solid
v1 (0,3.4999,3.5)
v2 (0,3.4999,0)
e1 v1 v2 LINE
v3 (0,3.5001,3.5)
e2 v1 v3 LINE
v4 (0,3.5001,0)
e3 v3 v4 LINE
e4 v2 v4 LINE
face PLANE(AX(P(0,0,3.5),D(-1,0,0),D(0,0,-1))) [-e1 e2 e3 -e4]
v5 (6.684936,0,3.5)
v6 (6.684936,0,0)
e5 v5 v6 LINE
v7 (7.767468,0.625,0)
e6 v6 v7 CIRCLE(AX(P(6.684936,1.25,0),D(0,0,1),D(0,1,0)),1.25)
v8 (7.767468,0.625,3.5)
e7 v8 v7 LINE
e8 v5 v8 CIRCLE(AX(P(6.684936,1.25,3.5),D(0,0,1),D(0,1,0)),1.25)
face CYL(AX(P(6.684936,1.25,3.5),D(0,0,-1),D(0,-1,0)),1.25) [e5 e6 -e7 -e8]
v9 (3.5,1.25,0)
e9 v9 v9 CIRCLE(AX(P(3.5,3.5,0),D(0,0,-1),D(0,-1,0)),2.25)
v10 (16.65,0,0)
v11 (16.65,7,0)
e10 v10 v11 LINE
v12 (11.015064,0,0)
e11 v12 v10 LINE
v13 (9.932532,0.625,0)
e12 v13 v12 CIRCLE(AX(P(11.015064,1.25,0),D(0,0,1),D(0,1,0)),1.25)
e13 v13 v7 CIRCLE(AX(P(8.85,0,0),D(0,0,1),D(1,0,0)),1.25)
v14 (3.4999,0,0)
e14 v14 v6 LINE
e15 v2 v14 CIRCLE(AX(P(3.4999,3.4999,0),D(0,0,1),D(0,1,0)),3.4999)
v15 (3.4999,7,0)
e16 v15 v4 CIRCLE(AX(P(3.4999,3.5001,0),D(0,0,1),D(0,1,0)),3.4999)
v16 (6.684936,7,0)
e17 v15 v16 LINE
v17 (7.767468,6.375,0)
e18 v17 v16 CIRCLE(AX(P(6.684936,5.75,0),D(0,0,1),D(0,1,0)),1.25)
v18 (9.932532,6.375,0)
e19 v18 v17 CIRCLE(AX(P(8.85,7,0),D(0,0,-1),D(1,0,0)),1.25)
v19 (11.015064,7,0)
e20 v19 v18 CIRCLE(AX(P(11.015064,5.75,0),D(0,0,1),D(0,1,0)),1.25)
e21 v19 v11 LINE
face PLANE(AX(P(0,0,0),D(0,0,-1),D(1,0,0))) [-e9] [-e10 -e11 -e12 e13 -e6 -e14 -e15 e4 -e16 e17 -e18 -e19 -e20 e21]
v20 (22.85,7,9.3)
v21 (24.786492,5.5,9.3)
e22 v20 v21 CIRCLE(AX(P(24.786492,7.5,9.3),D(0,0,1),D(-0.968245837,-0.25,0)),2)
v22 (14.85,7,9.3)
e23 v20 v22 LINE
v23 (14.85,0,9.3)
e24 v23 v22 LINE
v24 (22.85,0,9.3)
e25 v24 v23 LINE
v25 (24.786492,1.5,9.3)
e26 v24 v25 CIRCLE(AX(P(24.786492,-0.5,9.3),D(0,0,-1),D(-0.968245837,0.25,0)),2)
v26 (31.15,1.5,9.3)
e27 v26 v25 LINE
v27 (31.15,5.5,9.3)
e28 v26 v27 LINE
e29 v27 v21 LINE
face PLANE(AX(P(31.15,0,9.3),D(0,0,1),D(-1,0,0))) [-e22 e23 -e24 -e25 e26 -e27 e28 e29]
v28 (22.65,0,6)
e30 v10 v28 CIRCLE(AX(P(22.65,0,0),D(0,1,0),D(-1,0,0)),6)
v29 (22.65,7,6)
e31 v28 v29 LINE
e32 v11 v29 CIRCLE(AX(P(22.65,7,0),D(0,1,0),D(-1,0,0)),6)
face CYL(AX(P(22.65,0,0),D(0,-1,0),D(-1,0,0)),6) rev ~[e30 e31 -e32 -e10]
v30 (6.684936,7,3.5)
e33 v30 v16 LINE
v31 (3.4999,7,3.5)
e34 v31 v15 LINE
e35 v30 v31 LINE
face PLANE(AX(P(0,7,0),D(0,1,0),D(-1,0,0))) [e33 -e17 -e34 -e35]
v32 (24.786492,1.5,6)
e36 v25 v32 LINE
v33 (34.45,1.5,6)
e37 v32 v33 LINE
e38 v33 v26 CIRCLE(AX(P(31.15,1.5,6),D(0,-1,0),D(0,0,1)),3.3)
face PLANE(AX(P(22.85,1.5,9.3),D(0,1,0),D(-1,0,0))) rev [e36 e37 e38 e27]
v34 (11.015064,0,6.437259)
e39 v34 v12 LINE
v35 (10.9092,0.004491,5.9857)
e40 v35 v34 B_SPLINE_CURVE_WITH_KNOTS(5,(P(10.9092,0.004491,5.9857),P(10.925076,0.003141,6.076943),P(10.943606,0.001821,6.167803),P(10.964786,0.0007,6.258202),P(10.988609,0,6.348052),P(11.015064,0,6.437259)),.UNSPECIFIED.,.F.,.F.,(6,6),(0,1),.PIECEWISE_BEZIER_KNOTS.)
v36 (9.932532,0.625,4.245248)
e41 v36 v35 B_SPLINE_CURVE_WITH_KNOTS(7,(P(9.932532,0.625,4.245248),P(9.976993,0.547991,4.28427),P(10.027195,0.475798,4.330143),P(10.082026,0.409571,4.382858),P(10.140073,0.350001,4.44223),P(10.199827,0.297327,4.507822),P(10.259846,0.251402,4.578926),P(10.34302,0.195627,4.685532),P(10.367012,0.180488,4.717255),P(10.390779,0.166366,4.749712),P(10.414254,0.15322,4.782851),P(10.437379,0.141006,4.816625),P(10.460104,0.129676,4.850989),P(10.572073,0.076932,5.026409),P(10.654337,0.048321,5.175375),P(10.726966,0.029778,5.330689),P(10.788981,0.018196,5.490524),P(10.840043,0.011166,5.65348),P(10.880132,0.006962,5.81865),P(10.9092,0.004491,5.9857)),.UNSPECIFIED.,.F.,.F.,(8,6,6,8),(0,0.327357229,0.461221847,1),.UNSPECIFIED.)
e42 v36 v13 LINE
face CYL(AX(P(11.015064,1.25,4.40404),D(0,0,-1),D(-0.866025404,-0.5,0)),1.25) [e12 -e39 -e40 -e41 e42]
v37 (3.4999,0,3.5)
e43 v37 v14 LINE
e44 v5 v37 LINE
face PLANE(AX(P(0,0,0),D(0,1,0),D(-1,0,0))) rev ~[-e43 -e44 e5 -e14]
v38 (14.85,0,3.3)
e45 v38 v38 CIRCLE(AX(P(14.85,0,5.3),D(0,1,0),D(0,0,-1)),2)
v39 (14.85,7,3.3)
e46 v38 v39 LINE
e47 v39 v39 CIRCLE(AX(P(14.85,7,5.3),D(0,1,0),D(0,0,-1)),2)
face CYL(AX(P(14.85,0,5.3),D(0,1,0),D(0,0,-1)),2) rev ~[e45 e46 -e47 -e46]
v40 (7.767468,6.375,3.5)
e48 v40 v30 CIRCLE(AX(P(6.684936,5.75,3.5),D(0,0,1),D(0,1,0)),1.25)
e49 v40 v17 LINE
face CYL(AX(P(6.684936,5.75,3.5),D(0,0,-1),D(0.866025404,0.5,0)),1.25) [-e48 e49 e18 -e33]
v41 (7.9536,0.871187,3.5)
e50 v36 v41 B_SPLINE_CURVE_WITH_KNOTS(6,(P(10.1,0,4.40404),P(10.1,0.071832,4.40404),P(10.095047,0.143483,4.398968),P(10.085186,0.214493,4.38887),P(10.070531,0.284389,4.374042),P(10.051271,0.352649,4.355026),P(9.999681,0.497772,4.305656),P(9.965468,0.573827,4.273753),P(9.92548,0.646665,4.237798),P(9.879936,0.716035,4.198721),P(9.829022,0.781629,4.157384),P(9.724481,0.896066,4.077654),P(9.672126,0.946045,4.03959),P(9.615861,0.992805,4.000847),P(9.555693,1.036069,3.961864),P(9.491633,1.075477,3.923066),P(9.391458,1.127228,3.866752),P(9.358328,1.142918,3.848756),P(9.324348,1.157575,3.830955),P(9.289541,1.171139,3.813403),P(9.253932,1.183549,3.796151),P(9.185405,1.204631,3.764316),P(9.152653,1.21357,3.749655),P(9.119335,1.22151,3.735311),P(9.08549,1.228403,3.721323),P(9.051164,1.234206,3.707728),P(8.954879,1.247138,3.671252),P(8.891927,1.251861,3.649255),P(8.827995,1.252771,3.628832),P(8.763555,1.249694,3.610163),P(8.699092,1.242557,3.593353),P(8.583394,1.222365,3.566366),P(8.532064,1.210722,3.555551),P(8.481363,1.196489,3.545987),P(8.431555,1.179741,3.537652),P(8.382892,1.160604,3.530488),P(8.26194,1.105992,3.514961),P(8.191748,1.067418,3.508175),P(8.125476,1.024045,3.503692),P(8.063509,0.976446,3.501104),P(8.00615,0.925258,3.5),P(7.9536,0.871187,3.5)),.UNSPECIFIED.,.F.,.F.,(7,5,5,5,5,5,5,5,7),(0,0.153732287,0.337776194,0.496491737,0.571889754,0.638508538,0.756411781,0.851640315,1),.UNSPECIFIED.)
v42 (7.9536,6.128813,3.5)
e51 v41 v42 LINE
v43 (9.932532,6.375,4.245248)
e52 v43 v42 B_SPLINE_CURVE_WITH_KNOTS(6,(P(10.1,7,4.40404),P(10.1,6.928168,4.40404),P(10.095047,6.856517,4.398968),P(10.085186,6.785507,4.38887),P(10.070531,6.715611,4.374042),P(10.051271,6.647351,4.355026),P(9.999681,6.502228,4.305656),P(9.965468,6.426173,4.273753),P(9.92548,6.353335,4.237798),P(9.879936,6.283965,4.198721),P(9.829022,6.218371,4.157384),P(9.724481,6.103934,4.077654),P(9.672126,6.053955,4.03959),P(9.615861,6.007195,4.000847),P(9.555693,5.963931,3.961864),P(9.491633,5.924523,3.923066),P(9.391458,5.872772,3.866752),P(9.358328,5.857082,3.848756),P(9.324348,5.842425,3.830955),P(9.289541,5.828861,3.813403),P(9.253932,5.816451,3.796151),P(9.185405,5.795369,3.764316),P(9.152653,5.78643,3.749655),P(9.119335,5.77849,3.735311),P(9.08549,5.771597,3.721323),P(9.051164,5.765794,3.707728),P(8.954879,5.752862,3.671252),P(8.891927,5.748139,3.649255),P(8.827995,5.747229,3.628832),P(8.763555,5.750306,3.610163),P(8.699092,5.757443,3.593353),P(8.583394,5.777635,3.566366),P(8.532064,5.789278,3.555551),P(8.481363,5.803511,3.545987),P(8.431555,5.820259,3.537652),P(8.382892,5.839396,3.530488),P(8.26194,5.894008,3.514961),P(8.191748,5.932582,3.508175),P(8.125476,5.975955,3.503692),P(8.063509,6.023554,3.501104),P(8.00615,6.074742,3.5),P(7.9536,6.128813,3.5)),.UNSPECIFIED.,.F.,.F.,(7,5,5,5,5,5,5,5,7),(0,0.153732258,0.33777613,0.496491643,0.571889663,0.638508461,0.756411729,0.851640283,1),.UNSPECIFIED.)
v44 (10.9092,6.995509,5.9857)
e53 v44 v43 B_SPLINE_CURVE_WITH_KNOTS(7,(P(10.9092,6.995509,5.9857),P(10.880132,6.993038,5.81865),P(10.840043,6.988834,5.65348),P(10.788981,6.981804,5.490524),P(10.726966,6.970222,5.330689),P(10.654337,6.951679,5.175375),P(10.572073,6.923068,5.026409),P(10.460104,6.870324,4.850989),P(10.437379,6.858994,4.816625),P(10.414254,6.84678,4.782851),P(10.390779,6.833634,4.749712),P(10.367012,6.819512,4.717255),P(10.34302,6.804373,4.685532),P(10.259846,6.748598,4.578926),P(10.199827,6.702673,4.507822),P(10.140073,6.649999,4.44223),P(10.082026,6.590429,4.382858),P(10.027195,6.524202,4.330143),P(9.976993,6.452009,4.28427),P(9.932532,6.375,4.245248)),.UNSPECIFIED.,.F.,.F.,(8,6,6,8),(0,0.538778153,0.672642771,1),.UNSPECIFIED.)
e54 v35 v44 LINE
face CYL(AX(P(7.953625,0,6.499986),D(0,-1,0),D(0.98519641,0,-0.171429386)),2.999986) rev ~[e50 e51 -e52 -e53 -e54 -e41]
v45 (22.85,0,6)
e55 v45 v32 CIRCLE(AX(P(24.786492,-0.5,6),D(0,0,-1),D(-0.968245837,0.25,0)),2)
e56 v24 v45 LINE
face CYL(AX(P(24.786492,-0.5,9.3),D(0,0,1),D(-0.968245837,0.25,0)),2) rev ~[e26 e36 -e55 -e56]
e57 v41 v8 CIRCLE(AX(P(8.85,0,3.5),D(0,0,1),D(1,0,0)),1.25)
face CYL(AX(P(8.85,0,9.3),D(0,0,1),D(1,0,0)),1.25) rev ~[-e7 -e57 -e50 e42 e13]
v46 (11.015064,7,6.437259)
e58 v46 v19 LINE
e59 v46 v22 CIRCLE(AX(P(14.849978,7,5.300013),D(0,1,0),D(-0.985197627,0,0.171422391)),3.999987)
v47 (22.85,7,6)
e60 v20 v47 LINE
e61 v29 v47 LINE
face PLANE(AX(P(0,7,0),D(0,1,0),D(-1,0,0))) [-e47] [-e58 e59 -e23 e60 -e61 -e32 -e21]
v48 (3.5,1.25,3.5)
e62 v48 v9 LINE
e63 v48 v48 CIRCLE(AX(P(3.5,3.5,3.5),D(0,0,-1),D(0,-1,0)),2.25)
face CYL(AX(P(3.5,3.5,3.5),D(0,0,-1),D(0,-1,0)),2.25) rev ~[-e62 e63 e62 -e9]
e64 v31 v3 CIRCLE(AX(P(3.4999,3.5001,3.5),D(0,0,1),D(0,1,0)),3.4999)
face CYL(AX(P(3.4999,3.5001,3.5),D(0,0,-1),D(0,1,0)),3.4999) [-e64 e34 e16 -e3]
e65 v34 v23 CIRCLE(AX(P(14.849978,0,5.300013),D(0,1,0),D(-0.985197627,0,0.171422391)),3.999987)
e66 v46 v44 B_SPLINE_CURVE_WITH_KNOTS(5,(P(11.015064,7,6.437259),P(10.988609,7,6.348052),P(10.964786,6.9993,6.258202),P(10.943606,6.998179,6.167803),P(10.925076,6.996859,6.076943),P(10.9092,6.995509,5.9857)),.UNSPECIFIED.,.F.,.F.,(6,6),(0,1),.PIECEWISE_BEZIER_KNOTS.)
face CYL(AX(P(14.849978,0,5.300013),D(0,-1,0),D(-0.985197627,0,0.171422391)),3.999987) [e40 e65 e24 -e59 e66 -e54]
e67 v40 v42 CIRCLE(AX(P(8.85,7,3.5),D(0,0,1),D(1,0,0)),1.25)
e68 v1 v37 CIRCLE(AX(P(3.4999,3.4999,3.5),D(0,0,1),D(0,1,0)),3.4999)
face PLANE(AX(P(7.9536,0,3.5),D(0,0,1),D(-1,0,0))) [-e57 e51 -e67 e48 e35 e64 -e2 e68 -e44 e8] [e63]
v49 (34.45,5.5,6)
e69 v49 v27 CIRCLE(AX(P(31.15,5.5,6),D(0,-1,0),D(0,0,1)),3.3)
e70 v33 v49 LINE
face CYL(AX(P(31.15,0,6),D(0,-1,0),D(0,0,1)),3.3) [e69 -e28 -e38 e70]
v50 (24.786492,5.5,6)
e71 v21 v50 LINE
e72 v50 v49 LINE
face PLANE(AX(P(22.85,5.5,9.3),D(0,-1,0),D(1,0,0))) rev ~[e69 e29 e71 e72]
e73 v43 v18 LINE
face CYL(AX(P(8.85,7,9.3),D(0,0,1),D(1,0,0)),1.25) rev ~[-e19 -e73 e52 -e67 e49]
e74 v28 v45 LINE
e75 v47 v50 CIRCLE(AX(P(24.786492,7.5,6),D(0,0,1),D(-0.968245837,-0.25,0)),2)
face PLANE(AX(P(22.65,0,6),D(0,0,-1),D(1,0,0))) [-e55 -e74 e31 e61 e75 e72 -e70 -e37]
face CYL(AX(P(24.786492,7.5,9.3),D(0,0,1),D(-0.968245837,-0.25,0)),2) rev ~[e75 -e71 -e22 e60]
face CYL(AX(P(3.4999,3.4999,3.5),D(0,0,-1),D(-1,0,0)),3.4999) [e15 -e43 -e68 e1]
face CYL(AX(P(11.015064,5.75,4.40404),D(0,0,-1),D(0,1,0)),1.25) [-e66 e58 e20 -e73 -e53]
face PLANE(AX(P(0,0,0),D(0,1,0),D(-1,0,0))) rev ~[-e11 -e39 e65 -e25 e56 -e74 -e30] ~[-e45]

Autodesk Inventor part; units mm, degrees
ref_plane "YZ Plane" through (0, 0, 0) normal (1, 0, 0) x (0, 1, 0)
ref_plane "XY Plane" through (0, 0, 0) normal (0, 0, 1) x (1, 0, 0)
sketch "Skizze1" plane through (0, 0, 0) normal (0, 1, 0) x (-1, 0, 0)
  line L0 (0, 0) -> (-16.65, 0)
  arc A0 (-16.65, 0) -> (-22.65, 6) centre (-22.65, 0) ccw
  line L1 (-22.65, 6) -> (-34.45, 6)
  arc A1 (-31.15, 9.3) -> (-34.45, 6) centre (-31.15, 6) ccw
  line L2 (-31.15, 9.3) -> (-14.85, 9.3)
  arc A2 (-10.9092, 5.9857) -> (-14.85, 9.3) centre (-14.85, 5.3) ccw
  arc A3 (-10.9092, 5.9857) -> (-7.9536, 3.5) centre (-7.9536, 6.5) ccw
  line L3 (-7.9536, 3.5) -> (0, 3.5)
  line L4 (0, 3.5) -> (0, 0)
  dimension "d0" = 3
  dimension "d1" = 4
  dimension "d2" = 3.5
  dimension "d3" = 7.8
  dimension "d4" = 3.3
  dimension "d5" = 6
  dimension "d6" = 14.85
  dimension "d7" = 19.6
extrude "Extrusion1" add sketch "Skizze1" along normal blind 7
sketch "Skizze3" plane through (0, 0, 0) normal (0, -1, 0) x (1, 0, 0)
  arc A0 (14.85, 9.3) -> (10.9092, 5.9857) centre (14.85, 5.3) ccw projected
  point P0 (0, 0)
hole "Bohrung1" at (14.85, 0, 5.3) direction (0, 1, 0) diameter 4 depth 7
sketch "Skizze4" plane through (14.85, 0, 9.3) normal (0, 0, 1) x (1, 0, 0)
  line L0 (-2, 7) -> (2, 7) projected
  line L1 (2, 0) -> (-2, 0) projected
  line L2 (0, 0) -> (0, 7) construction
  line L3 (0, 7) -> (0, 0) construction
  line L4 (1.8, 0) -> (-14.85, 0) projected
  arc A0 (-4.75, 0) -> (-7.25, 0) centre (-6, 0) ccw
  dimension "d17" = 1.25
  dimension "d18" = 6
extrude "Extrusion2" cut sketch "Skizze4" against normal up to surface (9.3 mm away)
fillet "Rundung1" radius 1.25 2 edges at (10.1, 0, 2.202) (7.6, 0, 1.75)
ref_plane "Arbeitsebene1" through (0, 3.5, 0) normal (0, 1, 0) x (-1, 0, 0)
mirror "Spiegeln1" about plane through (0, 3.5, 0) normal (0, 1, 0) of "Extrusion2", "Rundung1"
fillet "Rundung2" radius 3.5 2 edges at (0, 0, 1.75) (0, 7, 1.75)
sketch "Skizze5" plane through (7.9536, 0.8712, 3.5) normal (0, 0, 1) x (1, 0, 0)
  arc A0 (-4.4536, 6.1288) -> (-4.4536, -0.8712) centre (-4.4536, 2.6288) ccw projected
  point P0 (-7.9536, -0.8712)
hole "Bohrung2" at (3.5, 3.5, 3.5) direction (0, 0, -1) diameter 4.5 depth 3.5
sketch "Skizze6" plane through (14.85, 0, 9.3) normal (0, 0, 1) x (1, 0, 0)
  line L0 (0, 0) -> (16.3, 0) projected
  line L1 (16.3, 0) -> (16.3, 7) projected
  line L2 (0, 7) -> (16.3, 7) projected
  line L3 (0, 0) -> (0, 7) projected
  line L4 (16.3, 0) -> (19.6, 0) projected
  line L5 (19.6, 0) -> (19.6, 7) projected
  line L6 (16.3, 7) -> (19.6, 7) projected
  line L7 (16.3, 0) -> (16.3, 7) projected
  line L8 (8, 5.5) -> (19.6, 5.5)
  line L9 (8, 5.5) -> (8, 7)
  point P0 (-14.85, 0)
  point P1 (8, 6.25)
  dimension "d32" = 1.5
  dimension "d38" = 8
extrude "Extrusion5" cut sketch "Skizze6" against normal up to surface (3.3 mm away) contours L8 L9 L2 L1 | L1 L6 L5 L8
mirror "Spiegeln2" about plane through (0, 3.5, 0) normal (0, 1, 0) of "Extrusion5"
fillet "Rundung3" radius 2 2 edges at (22.85, 5.5, 7.65) (22.85, 1.5, 7.65)
properties part number "KippHebel" material "Blei"
